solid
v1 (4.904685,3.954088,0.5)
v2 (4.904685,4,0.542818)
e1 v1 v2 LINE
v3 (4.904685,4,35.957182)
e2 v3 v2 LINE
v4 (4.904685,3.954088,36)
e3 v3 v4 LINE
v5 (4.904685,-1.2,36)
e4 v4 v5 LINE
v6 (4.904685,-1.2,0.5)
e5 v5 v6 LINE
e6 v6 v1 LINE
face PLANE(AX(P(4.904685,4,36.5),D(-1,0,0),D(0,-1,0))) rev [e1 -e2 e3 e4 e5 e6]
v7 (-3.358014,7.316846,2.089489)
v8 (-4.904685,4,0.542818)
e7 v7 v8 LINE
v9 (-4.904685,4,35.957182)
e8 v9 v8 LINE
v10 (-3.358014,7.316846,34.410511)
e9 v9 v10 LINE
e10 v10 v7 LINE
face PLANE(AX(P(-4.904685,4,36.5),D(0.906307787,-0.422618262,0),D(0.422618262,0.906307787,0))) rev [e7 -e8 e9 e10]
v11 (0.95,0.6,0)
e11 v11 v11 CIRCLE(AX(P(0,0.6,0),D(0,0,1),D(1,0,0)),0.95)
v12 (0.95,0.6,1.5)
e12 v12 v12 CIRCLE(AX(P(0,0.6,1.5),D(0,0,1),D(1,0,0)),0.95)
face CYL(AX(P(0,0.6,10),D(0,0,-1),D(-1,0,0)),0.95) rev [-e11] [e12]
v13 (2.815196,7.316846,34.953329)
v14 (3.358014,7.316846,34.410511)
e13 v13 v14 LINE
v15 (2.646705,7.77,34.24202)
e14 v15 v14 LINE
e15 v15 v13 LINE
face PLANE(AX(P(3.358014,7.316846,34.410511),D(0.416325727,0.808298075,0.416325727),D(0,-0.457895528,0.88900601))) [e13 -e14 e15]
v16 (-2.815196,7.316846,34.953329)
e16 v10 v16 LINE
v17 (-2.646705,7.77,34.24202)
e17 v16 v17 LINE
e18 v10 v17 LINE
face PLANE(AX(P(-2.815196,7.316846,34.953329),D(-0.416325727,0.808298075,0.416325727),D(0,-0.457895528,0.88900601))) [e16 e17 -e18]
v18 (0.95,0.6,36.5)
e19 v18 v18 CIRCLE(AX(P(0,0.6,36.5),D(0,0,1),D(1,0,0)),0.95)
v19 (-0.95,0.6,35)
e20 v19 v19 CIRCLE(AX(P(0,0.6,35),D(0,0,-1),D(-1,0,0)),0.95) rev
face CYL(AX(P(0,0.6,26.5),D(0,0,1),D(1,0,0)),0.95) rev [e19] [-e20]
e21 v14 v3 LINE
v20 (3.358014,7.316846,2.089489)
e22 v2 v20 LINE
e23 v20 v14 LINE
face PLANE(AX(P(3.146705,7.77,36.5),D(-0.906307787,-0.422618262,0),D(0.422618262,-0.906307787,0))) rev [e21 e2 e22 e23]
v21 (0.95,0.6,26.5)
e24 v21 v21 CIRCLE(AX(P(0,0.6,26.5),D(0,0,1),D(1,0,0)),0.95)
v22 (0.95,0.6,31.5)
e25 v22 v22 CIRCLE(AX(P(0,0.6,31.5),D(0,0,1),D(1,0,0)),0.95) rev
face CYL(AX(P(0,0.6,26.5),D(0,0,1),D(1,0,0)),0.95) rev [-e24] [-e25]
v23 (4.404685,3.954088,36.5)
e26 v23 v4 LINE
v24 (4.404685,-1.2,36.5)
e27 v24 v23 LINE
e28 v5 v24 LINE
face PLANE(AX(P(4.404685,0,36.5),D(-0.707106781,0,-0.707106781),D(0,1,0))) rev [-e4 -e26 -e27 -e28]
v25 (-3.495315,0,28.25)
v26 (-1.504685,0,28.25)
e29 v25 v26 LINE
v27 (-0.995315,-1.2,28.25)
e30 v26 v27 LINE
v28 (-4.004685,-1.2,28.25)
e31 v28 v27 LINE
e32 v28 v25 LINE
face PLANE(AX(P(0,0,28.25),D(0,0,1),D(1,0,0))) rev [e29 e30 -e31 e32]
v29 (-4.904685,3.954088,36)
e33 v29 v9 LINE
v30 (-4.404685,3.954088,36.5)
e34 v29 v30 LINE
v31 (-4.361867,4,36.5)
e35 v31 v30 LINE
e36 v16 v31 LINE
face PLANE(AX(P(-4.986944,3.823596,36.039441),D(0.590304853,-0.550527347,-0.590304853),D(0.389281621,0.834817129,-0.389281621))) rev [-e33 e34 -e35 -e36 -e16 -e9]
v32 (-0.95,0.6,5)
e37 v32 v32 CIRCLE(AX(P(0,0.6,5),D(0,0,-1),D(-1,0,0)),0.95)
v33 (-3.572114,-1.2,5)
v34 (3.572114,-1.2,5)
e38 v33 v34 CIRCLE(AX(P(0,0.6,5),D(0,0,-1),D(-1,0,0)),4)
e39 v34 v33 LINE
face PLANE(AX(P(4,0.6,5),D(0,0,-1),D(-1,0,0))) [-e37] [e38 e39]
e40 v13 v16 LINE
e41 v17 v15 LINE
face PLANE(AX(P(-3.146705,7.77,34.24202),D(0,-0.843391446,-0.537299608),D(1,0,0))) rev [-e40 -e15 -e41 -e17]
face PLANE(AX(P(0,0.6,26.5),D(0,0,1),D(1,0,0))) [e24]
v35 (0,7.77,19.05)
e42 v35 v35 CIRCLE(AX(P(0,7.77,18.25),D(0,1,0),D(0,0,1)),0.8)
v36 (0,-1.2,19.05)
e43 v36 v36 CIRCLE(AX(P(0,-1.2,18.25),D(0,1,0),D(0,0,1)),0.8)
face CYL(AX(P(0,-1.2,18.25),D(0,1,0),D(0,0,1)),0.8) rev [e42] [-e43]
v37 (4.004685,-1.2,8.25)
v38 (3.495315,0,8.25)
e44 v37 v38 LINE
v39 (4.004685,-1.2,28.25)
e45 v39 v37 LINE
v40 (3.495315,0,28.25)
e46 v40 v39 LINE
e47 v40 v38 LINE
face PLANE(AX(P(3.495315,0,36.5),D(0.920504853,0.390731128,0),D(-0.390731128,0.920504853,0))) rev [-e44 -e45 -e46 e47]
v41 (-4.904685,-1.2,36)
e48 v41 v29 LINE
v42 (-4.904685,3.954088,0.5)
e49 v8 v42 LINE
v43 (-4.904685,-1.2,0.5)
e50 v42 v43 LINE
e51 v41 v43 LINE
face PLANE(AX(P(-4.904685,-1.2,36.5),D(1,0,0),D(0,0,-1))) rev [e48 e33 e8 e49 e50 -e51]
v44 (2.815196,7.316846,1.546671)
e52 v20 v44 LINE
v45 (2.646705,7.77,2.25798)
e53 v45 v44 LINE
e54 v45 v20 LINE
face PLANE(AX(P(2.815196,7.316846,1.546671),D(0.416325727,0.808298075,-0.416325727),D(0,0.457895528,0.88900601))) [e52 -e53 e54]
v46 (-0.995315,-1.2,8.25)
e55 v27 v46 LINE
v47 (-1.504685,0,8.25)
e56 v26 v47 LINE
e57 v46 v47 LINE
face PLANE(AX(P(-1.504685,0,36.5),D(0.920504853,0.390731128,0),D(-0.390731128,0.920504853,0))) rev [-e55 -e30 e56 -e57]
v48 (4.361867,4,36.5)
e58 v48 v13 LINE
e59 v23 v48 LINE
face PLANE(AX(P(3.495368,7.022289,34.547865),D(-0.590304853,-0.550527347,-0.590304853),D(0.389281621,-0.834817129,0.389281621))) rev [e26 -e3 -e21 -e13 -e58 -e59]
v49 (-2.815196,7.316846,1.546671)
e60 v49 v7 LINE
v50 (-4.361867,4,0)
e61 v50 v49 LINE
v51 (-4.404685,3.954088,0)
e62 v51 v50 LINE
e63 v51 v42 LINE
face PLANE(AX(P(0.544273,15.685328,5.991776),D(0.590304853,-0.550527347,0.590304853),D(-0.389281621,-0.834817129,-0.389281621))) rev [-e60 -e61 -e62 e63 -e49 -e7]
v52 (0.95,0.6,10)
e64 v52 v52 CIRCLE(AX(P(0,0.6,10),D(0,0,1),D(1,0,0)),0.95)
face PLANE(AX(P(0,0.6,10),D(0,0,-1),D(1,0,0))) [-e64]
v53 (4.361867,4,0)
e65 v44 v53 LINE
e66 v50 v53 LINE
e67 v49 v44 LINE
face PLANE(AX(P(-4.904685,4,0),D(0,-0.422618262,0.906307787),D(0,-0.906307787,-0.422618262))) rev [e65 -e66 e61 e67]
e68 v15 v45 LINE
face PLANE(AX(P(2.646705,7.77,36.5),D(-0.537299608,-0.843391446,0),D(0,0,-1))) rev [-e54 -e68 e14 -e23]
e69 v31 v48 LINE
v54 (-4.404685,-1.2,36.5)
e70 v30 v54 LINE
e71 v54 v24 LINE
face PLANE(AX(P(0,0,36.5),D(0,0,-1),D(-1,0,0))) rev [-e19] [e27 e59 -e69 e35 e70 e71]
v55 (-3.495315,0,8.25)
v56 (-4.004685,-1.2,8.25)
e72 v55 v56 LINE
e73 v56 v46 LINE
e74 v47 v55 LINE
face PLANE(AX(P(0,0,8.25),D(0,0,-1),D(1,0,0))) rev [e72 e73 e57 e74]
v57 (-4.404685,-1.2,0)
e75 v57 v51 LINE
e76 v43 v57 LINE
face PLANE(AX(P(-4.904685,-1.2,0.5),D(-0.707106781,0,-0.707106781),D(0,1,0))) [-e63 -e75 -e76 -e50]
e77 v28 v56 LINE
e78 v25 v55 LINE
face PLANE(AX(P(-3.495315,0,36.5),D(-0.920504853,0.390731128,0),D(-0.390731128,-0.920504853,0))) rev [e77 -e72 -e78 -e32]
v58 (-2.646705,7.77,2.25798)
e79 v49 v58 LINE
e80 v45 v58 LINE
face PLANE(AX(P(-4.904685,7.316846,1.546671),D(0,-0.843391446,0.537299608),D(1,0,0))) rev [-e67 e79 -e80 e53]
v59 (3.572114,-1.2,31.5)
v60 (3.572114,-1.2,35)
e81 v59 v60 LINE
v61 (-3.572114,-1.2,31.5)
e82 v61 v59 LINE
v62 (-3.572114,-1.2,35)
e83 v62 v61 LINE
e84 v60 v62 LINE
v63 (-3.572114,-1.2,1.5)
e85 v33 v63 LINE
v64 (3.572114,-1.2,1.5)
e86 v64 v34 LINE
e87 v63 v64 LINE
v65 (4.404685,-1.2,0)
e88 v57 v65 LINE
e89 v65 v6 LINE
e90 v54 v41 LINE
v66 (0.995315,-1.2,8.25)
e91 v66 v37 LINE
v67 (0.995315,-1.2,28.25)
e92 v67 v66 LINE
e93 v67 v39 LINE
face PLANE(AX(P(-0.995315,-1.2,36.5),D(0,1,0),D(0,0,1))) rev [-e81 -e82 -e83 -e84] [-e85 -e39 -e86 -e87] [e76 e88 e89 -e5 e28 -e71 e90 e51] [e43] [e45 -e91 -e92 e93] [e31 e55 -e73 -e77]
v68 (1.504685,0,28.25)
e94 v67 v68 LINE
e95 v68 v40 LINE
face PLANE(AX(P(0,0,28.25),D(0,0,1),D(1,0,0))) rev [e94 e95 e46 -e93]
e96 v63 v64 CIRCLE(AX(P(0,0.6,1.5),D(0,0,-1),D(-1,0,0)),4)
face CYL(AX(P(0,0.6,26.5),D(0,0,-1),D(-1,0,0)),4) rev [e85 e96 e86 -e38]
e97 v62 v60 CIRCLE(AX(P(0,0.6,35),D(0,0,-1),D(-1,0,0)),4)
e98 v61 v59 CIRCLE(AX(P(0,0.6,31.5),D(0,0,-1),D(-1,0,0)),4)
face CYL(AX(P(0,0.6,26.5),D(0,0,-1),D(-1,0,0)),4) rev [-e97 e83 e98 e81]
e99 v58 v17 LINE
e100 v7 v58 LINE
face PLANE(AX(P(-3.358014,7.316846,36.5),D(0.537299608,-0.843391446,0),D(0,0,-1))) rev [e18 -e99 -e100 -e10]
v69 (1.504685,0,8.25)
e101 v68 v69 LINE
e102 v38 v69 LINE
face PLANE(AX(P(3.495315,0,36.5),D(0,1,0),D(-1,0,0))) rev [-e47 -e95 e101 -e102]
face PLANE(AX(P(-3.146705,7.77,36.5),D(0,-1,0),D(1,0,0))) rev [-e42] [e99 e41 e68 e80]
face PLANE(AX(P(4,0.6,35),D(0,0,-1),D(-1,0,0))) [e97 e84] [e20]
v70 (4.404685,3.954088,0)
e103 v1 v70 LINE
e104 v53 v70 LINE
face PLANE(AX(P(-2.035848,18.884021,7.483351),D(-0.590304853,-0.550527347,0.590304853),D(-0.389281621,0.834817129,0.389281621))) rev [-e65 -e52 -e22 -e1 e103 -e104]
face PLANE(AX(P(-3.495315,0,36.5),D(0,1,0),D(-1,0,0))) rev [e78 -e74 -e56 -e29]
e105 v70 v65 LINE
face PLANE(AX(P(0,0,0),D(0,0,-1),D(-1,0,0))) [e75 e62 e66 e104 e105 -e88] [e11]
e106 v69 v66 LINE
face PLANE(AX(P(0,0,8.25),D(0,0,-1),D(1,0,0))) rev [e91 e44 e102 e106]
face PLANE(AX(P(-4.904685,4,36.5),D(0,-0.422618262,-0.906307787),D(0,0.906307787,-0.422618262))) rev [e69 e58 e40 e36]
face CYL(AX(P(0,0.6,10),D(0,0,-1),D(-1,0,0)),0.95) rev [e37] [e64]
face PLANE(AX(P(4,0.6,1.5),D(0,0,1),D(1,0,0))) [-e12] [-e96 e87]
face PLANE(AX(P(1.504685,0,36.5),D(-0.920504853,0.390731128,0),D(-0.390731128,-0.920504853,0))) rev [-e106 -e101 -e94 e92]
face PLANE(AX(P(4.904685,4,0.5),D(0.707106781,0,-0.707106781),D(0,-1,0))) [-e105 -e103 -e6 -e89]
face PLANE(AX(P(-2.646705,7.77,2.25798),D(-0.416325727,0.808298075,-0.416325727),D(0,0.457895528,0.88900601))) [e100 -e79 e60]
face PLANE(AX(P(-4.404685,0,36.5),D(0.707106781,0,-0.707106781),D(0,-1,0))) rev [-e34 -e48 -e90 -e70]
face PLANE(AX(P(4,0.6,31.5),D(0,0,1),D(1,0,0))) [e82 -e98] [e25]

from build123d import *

# Parameters (mm, degrees)
EXTRUDE_1_DEPTH     = 36.5
CUT_EXTRUDE_1_DEPTH = 39.585575484
SKETCH_3_W          = 8.80936978
SKETCH_3_H          = 5.154088086
EXTRUDE_3_DEPTH     = 8.25
SKETCH_4_R          = 0.95
CUT_EXTRUDE_2_DEPTH = 10
SKETCH_5_W          = 4
SKETCH_5_H          = 3.5
SKETCH_6_R          = 0.8
CUT_EXTRUDE_3_DEPTH = 38.904707278


with BuildPart() as part:
    # ｽｹｯﾁ1 → ﾎﾞｽ - 押し出し1 (new body)
    with BuildSketch(Plane.XY):
        Polygon((-3.49531511, 0), (-1.50468489, 0), (-0.99531511, -1.2), (0.99531511, -1.2), (1.50468489, 0), (3.49531511, 0), (4.00468489, -1.2), (4.90468489, -1.2), (4.90468489, 4), (3.146705018, 7.77), (-3.146705018, 7.77), (-4.90468489, 4), (-4.90468489, -1.2), (-4.00468489, -1.2), align=None)
    extrude(amount=EXTRUDE_1_DEPTH)

    # ｽｹｯﾁ2 → ｶｯﾄ - 押し出し1 (cut, through all)
    with BuildSketch(Plane(origin=(4.90468489, 0, 0), x_dir=(0, 0, -1), z_dir=(1, 0, 0))):
        Polygon((-36.5, 4), (-34.742020129, 7.77), (-36.5, 7.77), align=None)
        Polygon((-1.757979871, 7.77), (0, 7.77), (0, 4), align=None)
    extrude(amount=-CUT_EXTRUDE_1_DEPTH, mode=Mode.SUBTRACT)

    # 面取り1
    # the kernel refuses this chamfer: 0.5 mm, written as the material it takes off along each edge
    with BuildSketch(Plane(origin=(-2.939971721, 7.467897404, 1.964713169), x_dir=(0.19590671622030337, 0.5268881046463144, 0.8270486586180961), z_dir=(-0.41632572739388213, 0.8082980746110389, -0.4163257273938791)), Plane(origin=(2.939971721, 7.467897404, 1.964713169), x_dir=(-0.8270486586180947, 0.5268881046463163, 0.1959067162203037), z_dir=(0.4163257273938816, 0.8082980746110384, -0.41632572739388035))) as chamfer_1_piece_1:
        Polygon((-0.400884159, 0.228990916), (0.459173014, 0.228990916), (-0.058288855, -0.457981831), align=None)
    extrude(amount=0.4579583, mode=Mode.SUBTRACT)
    with BuildSketch(Plane(origin=(-2.939971721, 7.467897404, 34.535286831), x_dir=(-0.1959067162203061, -0.5268881046463181, 0.827048658618093), z_dir=(-0.4163257273938827, 0.8082980746110371, 0.4163257273938816))) as chamfer_1_piece_2:
        Polygon((-0.459173014, 0.228990916), (0.400884159, 0.228990916), (0.058288855, -0.457981831), align=None)
    extrude(amount=0.4579583, mode=Mode.SUBTRACT)
    with BuildSketch(Plane(origin=(2.939971721, 7.467897404, 34.535286831), x_dir=(-0.8270486586180942, 0.5268881046463159, -0.19590671622030717), z_dir=(0.41632572739387785, 0.8082980746110375, 0.41632572739388596))) as chamfer_1_piece_3:
        Polygon((-0.400884159, -0.228990916), (0.459173014, -0.228990916), (-0.058288855, 0.457981831), align=None)
    extrude(amount=0.4579583, mode=Mode.SUBTRACT)
    with BuildSketch(Plane(origin=(4.90468489, -2.485841494, 36.5), x_dir=(-0.999621916911297, 0, 0.0274958766105822), z_dir=(0, 1, 0)), Plane(origin=(-4.90468489, 5.285841494, 36.5), x_dir=(0.999621916911297, 0, 0.0274958766105822), z_dir=(0, -1, 0))) as chamfer_1_piece_4:
        with BuildLine():
            Line((0.514336598, 0), (-0.028273577, -0.513558897))
            Line((-0.028273577, -0.513558897), (-0.038269797, -0.513283938))
            ThreePointArc((-0.038269797, -0.513283938), (-0.017064614, -0.256698915), (-0.009996219, 0.000274959))
            Line((-0.009996219, 0.000274959), (0.000274959, 0.009996219))
            ThreePointArc((0.000274959, 0.009996219), (0.257248832, 0.002927825), (0.514611556, 0.009996219))
            Line((0.514611556, 0.009996219), (0.514336598, 0))
        make_face()
    extrude(amount=7.771682988, mode=Mode.SUBTRACT)
    with BuildSketch(Plane(origin=(-4.90468489, 5.285841494, 0), x_dir=(0.9996219169112968, 0, -0.02749587661058639), z_dir=(0, -1, 0)), Plane(origin=(4.90468489, -2.485841494, 0), x_dir=(-0.9996219169112968, 0, -0.02749587661058639), z_dir=(0, 1, 0))) as chamfer_1_piece_5:
        with BuildLine():
            Line((0.514336598, 0), (-0.028273577, 0.513558897))
            Line((-0.028273577, 0.513558897), (-0.038269797, 0.513283938))
            ThreePointArc((-0.038269797, 0.513283938), (-0.017064614, 0.256698915), (-0.009996219, -0.000274959))
            Line((-0.009996219, -0.000274959), (0.000274959, -0.009996219))
            ThreePointArc((0.000274959, -0.009996219), (0.257248832, -0.002927825), (0.514611556, -0.009996219))
            Line((0.514611556, -0.009996219), (0.514336598, 0))
        make_face()
    extrude(amount=7.771682988, mode=Mode.SUBTRACT)
    with BuildSketch(Plane(origin=(-3.146705018, 7.77, 0.46553106), x_dir=(-0.4413655645980938, -0.8973273864019787, 0), z_dir=(0, 0, 1))) as chamfer_1_piece_6:
        with BuildLine():
            Line((0.516979525, 0), (-0.237770334, 0.459056747))
            Line((-0.237770334, 0.459056747), (-0.246743608, 0.454643091))
            ThreePointArc((-0.246743608, 0.454643091), (-0.123037104, 0.227486173), (-0.008973274, -0.004413656))
            Line((-0.008973274, -0.004413656), (0.000207861, -0.009997839))
            ThreePointArc((0.000207861, -0.009997839), (0.25858594, -0.004626004), (0.517187386, -0.009997839))
            Line((0.517187386, -0.009997839), (0.516979525, 0))
        make_face()
    extrude(amount=35.568937881, mode=Mode.SUBTRACT)
    with BuildSketch(Plane(origin=(3.146705018, 7.77, 0.46553106), x_dir=(0.4413655645980931, -0.8973273864019791, 0), z_dir=(0, 0, 1))) as chamfer_1_piece_7:
        with BuildLine():
            Line((0.516979525, 0), (-0.237770334, -0.459056747))
            Line((-0.237770334, -0.459056747), (-0.246743608, -0.454643091))
            ThreePointArc((-0.246743608, -0.454643091), (-0.123037104, -0.227486173), (-0.008973274, 0.004413656))
            Line((-0.008973274, 0.004413656), (0.000207861, 0.009997839))
            ThreePointArc((0.000207861, 0.009997839), (0.25858594, 0.004626004), (0.517187386, 0.009997839))
            Line((0.517187386, 0.009997839), (0.516979525, 0))
        make_face()
    extrude(amount=35.568937881, mode=Mode.SUBTRACT)
    with BuildSketch(Plane(origin=(4.43915383, 7.77, 34.742020129), x_dir=(0, -0.8973273864019841, 0.4413655645980827), z_dir=(-1, 0, 0))) as chamfer_1_piece_8:
        with BuildLine():
            Line((0.516979525, 0), (-0.237770334, -0.459056747))
            Line((-0.237770334, -0.459056747), (-0.246743608, -0.454643091))
            ThreePointArc((-0.246743608, -0.454643091), (-0.123037104, -0.227486173), (-0.008973274, 0.004413656))
            Line((-0.008973274, 0.004413656), (0.000207861, 0.009997839))
            ThreePointArc((0.000207861, 0.009997839), (0.25858594, 0.004626004), (0.517187386, 0.009997839))
            Line((0.517187386, 0.009997839), (0.516979525, 0))
        make_face()
    extrude(amount=8.87830766, mode=Mode.SUBTRACT)
    with BuildSketch(Plane(origin=(2.645006091, 8.845896822, 34.240321201), x_dir=(-0.9208340423276122, -0.3421923931836881, 0.1870000869994703), z_dir=(0.38928162063502675, -0.8348171294789896, 0.3892816206350195)), Plane(origin=(-5.406383817, 2.924103178, 37.001698928), x_dir=(0.9208340423276125, -0.34219239318369504, 0.18700008699945572), z_dir=(0.38928162063502675, 0.8348171294789896, -0.3892816206350195))) as chamfer_1_piece_9:
        with BuildLine():
            Line((0.515512576, 0), (-0.117174183, 0.502019349))
            Line((-0.117174183, 0.502019349), (-0.126965941, 0.499989208))
            ThreePointArc((-0.126965941, 0.499989208), (-0.062103739, 0.250280562), (-0.009791758, -0.002030141))
            Line((-0.009791758, -0.002030141), (0.000248629, -0.009996909))
            ThreePointArc((0.000248629, -0.009996909), (0.257845581, -0.003590326), (0.515761205, -0.009996909))
            Line((0.515761205, -0.009996909), (0.515512576, 0))
        make_face()
    extrude(amount=7.093521964, mode=Mode.SUBTRACT)
    with BuildSketch(Plane(origin=(2.645006091, 8.845896822, 2.259678799), x_dir=(-0.9208340423276122, -0.3421923931836898, -0.18700008699946685), z_dir=(0.3892816206350268, -0.8348171294789898, -0.3892816206350187)), Plane(origin=(-5.406383817, 2.924103178, -0.501698928), x_dir=(0.9208340423276122, -0.34219239318368977, -0.1870000869994671), z_dir=(0.3892816206350268, 0.8348171294789898, 0.3892816206350187))) as chamfer_1_piece_10:
        with BuildLine():
            Line((0.515512576, 0), (-0.117174183, -0.502019349))
            Line((-0.117174183, -0.502019349), (-0.126965941, -0.499989208))
            ThreePointArc((-0.126965941, -0.499989208), (-0.062103739, -0.250280562), (-0.009791758, 0.002030141))
            Line((-0.009791758, 0.002030141), (0.000248629, 0.009996909))
            ThreePointArc((0.000248629, 0.009996909), (0.257845581, 0.003590326), (0.515761205, 0.009996909))
            Line((0.515761205, 0.009996909), (0.515512576, 0))
        make_face()
    extrude(amount=7.093521964, mode=Mode.SUBTRACT)
    with BuildSketch(Plane(origin=(4.43915383, 7.77, 1.757979871), x_dir=(0, -0.8973273864019825, -0.4413655645980858), z_dir=(-1, 0, 0))) as chamfer_1_piece_11:
        with BuildLine():
            Line((0.516979525, 0), (-0.237770334, 0.459056747))
            Line((-0.237770334, 0.459056747), (-0.246743608, 0.454643091))
            ThreePointArc((-0.246743608, 0.454643091), (-0.123037104, 0.227486173), (-0.008973274, -0.004413656))
            Line((-0.008973274, -0.004413656), (0.000207861, -0.009997839))
            ThreePointArc((0.000207861, -0.009997839), (0.25858594, -0.004626004), (0.517187386, -0.009997839))
            Line((0.517187386, -0.009997839), (0.516979525, 0))
        make_face()
    extrude(amount=8.87830766, mode=Mode.SUBTRACT)

    # ｽｹｯﾁ3 → ﾎﾞｽ - 押し出し3 (add)
    with BuildSketch(Plane.XY.offset(36.5)):
        with Locations((0, 1.377044043)):
            Rectangle(SKETCH_3_W, SKETCH_3_H)
    extrude_3 = extrude(amount=-EXTRUDE_3_DEPTH)

    # ｽｹｯﾁ4 → ｶｯﾄ - 押し出し2 (cut)
    with BuildSketch(Plane.XY.offset(36.5)):
        with Locations((0, 0.6)):
            Circle(SKETCH_4_R)
    cut_extrude_2 = extrude(amount=-CUT_EXTRUDE_2_DEPTH, mode=Mode.SUBTRACT)

    # ﾐﾗｰ1: ﾎﾞｽ - 押し出し3, ｶｯﾄ - 押し出し2 across plane
    add(extrude_3.mirror(Plane(origin=(0, 0, 18.25), x_dir=(1, 0, 0), z_dir=(0, 0, -1))))
    add(cut_extrude_2.mirror(Plane(origin=(0, 0, 18.25), x_dir=(1, 0, 0), z_dir=(0, 0, -1))), mode=Mode.SUBTRACT)

    # ｽｹｯﾁ5 → ｶｯﾄ - 回転1 (revolve, cut)
    with BuildSketch(Plane(origin=(0, 0.6, 0), x_dir=(1, 0, 0), z_dir=(0, 1, 0))):
        with Locations((2, -33.25)):
            Rectangle(SKETCH_5_W, SKETCH_5_H)
        with Locations((2, -3.25)):
            Rectangle(SKETCH_5_W, SKETCH_5_H)
    revolve(axis=Axis((0, 0.6, 26.5), (0, 0, 1)), mode=Mode.SUBTRACT)

    # ｽｹｯﾁ6 → ｶｯﾄ - 押し出し3 (cut, through all)
    with BuildSketch(Plane(origin=(0, 7.77, 0), x_dir=(1, 0, 0), z_dir=(0, 1, 0))):
        with Locations(Location((0, -18.25, 0), (0, 0, 270))):
            Circle(SKETCH_6_R)
    extrude(amount=-CUT_EXTRUDE_3_DEPTH, mode=Mode.SUBTRACT)


solid = part.part
